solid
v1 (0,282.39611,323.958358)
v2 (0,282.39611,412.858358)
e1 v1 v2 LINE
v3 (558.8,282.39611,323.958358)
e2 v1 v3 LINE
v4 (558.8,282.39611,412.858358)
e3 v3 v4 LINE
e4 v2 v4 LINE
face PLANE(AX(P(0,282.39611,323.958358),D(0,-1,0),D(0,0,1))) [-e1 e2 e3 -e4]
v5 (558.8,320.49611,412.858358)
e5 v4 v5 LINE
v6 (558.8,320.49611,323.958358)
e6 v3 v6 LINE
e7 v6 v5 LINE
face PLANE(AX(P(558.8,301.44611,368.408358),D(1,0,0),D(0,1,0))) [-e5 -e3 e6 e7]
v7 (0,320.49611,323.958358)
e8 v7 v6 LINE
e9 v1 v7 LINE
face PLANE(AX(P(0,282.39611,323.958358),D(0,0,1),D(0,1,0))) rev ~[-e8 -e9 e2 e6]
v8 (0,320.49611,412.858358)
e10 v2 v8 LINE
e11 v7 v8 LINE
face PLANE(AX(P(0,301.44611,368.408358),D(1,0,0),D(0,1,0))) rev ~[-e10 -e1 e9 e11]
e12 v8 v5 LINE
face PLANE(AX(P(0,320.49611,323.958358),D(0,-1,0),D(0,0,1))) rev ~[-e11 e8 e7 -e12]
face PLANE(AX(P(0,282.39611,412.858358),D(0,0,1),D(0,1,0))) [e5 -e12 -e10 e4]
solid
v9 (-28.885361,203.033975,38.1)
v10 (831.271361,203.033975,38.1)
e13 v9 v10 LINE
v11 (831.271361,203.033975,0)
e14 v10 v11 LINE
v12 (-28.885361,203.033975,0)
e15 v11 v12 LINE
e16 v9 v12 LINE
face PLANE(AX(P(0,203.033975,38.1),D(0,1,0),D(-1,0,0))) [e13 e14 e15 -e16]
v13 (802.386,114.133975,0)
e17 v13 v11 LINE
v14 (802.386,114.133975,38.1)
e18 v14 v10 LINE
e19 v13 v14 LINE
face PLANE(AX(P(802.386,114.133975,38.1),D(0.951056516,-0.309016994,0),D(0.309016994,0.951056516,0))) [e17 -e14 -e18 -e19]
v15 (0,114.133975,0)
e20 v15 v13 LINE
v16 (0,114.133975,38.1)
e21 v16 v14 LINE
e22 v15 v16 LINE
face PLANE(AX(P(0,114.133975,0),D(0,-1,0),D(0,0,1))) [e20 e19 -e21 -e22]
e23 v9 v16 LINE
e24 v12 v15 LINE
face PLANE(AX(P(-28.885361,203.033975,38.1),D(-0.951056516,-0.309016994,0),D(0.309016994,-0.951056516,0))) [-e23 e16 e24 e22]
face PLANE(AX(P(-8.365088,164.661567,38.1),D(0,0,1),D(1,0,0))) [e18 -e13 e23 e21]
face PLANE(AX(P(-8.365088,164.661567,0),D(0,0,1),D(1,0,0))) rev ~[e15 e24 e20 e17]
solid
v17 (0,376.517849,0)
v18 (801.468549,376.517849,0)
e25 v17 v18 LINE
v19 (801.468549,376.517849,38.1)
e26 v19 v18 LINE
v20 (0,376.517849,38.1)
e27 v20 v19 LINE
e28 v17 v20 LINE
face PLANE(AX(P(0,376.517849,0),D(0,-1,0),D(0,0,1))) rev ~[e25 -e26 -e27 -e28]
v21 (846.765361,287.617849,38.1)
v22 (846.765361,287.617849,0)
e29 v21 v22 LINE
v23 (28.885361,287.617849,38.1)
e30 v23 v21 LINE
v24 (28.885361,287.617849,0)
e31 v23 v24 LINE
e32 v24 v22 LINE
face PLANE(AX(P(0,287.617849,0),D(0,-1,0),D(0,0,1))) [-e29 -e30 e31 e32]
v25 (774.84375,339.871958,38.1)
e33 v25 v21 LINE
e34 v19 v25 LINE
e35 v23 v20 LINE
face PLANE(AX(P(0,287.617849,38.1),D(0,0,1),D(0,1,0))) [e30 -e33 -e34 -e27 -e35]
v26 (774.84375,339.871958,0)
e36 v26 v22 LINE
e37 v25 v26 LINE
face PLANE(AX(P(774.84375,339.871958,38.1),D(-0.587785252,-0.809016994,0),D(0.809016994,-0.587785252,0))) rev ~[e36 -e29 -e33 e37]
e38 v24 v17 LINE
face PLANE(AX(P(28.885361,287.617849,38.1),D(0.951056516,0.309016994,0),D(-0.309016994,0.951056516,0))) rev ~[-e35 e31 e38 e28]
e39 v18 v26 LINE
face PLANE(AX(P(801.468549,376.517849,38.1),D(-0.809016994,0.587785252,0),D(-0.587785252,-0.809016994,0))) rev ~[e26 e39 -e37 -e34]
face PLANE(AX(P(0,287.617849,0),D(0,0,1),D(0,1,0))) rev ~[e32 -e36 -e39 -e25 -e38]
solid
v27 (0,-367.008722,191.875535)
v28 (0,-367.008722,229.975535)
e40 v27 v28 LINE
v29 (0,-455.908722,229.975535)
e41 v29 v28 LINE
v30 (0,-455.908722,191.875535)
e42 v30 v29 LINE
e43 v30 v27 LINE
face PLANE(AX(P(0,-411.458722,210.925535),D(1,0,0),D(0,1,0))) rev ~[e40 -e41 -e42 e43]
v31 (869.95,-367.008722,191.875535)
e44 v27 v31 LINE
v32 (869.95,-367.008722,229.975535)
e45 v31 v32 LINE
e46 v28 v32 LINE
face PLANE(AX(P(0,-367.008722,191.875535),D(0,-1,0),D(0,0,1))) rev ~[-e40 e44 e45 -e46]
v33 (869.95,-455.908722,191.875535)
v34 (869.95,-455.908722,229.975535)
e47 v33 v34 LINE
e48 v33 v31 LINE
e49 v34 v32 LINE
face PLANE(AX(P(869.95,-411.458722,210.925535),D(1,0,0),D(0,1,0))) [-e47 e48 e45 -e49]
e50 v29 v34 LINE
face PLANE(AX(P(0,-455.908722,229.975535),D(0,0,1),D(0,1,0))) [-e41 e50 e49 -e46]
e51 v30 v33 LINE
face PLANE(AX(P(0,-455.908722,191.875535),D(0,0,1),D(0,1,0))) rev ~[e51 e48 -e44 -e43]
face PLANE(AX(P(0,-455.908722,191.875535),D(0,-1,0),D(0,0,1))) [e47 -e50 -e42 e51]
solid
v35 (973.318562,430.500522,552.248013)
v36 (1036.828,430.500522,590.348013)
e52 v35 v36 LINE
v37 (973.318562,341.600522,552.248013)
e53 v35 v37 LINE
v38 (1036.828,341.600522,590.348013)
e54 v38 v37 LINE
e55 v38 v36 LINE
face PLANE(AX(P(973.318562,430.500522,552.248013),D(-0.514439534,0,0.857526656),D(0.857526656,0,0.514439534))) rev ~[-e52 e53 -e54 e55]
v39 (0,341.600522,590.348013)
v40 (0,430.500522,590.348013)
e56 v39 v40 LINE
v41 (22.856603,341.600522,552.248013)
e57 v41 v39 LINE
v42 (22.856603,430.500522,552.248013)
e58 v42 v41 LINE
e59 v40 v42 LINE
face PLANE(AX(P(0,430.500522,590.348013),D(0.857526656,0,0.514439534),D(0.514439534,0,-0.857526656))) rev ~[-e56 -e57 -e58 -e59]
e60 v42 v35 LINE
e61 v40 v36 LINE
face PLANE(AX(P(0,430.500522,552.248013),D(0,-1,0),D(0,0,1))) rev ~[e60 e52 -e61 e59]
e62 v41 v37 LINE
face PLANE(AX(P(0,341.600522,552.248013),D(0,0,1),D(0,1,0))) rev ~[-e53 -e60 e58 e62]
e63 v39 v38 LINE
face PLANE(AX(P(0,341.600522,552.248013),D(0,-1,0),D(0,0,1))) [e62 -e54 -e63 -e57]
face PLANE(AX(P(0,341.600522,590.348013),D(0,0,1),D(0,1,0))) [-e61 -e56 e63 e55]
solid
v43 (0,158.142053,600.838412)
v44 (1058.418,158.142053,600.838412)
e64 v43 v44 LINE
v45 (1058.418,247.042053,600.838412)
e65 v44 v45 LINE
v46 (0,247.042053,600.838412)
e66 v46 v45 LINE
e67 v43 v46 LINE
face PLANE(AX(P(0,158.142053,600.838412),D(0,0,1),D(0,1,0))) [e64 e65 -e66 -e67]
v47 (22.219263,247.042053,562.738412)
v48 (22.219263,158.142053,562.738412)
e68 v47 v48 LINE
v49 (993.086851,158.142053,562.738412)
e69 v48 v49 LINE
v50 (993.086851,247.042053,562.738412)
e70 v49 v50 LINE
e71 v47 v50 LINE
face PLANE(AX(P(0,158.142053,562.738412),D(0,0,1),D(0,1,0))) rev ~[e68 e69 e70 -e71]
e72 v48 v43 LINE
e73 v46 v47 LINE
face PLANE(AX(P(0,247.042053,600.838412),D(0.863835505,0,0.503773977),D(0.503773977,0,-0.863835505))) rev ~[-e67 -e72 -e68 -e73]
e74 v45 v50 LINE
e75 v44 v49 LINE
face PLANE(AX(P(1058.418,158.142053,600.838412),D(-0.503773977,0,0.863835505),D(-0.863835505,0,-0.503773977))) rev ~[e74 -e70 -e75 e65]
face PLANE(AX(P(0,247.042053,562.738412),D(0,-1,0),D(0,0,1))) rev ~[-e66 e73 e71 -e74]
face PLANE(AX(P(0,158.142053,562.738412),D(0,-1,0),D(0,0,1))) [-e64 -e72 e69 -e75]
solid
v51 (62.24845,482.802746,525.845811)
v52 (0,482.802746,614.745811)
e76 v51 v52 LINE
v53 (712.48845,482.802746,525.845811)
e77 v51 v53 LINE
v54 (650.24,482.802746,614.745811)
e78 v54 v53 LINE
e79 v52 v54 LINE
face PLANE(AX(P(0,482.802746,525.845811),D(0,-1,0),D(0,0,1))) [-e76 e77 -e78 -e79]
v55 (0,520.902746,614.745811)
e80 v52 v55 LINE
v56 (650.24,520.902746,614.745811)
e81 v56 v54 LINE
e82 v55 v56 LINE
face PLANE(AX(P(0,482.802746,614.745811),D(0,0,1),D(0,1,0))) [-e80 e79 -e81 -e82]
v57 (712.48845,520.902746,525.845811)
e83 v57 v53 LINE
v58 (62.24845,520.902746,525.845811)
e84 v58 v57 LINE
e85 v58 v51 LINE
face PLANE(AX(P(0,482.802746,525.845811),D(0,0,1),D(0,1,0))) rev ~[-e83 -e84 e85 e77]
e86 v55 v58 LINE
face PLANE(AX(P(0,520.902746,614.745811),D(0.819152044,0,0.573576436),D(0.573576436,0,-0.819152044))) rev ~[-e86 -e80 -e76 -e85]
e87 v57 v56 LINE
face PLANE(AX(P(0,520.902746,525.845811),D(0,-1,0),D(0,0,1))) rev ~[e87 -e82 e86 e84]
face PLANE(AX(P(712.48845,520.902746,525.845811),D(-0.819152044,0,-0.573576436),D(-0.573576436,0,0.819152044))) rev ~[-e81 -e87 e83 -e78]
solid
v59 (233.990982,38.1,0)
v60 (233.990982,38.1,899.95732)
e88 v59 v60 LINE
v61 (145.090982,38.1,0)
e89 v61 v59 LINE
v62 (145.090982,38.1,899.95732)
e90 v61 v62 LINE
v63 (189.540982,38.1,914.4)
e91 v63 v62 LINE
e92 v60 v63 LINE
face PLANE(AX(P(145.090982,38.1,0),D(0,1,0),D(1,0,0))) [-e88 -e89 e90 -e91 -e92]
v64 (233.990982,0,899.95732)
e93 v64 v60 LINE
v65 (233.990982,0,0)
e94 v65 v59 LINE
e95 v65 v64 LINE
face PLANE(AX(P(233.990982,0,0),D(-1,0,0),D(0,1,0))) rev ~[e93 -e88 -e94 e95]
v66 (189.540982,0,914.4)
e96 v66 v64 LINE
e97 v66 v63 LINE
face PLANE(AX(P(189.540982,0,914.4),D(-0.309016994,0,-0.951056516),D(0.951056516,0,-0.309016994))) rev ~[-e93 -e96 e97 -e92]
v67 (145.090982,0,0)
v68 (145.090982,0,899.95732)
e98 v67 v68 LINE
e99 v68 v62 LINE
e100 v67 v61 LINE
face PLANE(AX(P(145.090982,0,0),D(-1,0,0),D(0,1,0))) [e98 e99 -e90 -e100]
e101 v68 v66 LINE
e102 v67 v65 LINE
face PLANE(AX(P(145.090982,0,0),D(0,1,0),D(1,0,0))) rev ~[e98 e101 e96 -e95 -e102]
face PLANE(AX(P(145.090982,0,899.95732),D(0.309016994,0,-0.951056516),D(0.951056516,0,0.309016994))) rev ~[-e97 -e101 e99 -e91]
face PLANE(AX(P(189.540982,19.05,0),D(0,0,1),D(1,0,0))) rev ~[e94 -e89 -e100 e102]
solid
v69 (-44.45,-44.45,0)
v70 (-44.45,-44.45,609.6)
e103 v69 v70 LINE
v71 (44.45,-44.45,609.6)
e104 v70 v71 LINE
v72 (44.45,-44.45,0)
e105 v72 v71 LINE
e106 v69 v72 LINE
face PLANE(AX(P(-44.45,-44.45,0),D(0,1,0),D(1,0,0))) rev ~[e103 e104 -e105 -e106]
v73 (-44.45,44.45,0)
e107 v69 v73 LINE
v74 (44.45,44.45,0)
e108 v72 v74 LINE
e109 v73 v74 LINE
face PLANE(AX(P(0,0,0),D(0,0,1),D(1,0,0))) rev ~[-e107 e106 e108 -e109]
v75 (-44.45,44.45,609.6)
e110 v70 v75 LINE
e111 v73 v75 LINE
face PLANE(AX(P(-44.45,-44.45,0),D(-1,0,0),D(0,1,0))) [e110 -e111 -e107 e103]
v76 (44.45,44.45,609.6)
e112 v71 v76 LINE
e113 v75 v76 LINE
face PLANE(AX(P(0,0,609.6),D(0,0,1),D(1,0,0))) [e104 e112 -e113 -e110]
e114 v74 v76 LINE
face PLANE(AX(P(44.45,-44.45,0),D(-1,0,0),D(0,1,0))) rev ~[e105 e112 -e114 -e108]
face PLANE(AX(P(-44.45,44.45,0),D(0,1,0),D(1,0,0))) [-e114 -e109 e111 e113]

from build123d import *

# Parameters (mm, degrees)
F0_W      = 88.9
F0_H      = 88.9
F1_DEPTH  = 609.6
F2_W      = 88.9
F2_H      = 38.1
F3_DEPTH  = 914.4
F5_DEPTH  = 44.451
F6_W      = 88.9
F6_H      = 38.1
F7_DEPTH  = 802.386
F9_DEPTH  = 38.1
F10_W     = 88.9
F10_H     = 38.1
F11_DEPTH = 1058.418
F13_DEPTH = 88.901
F15_DEPTH = 291.4930525193
F16_W     = 88.9
F16_H     = 38.1
F17_DEPTH = 869.95
F18_W     = 88.9
F18_H     = 38.1
F19_DEPTH = 1036.828
F21_DEPTH = 886.4102444897
F22_DEPTH = 886.4102444897
F23_W     = 88.9
F23_H     = 38.1
F24_DEPTH = 1066.8
F26_DEPTH = 38.101
F28_DEPTH = 38.101
F29_W     = 38.1
F29_H     = 88.9
F30_DEPTH = 558.8
F31_W     = 38.1
F31_H     = 88.9
F32_DEPTH = 762
F34_DEPTH = 976.812467675
F36_DEPTH = 976.812467675
F37_W     = 88.9
F37_H     = 38.1
F38_DEPTH = 508
F40_DEPTH = 38.101
F42_DEPTH = 38.101


with BuildPart() as f1:
    # F0 (on Top) → F1 (new body)
    with BuildSketch(Plane.XY):
        Rectangle(F0_W, F0_H)
    extrude(amount=F1_DEPTH)


with BuildPart() as f3:
    # F2 (on Top) → F3 (new body)
    with BuildSketch(Plane.XY):
        with Locations((189.5409819244, 19.05)):
            Rectangle(F2_W, F2_H)
    extrude(amount=F3_DEPTH)

    # F4 (on face) → F5 (cut, through all)
    with BuildSketch(Plane.XZ):
        Polygon((145.0909819244, 899.9573195024), (189.5409819244, 914.4), (145.0909819244, 914.4), align=None)
        Polygon((233.9909819244, 914.4), (189.5409819244, 914.4), (233.9909819244, 899.9573195024), align=None)
    extrude(amount=-F5_DEPTH, mode=Mode.SUBTRACT)


with BuildPart() as f7:
    # F6 (on Right) → F7 (new body)
    with BuildSketch(Plane.YZ):
        with Locations((158.5839751139, 19.05)):
            Rectangle(F6_W, F6_H)
    extrude(amount=F7_DEPTH)

    # F8 (on face) → F9 (join)
    with BuildSketch(Plane.XY.offset(38.1)):
        Polygon((-28.8853609951, 203.0339751139), (0, 114.1339751139), (0, 203.0339751139), align=None)
        Polygon((802.386, 203.0339751139), (802.386, 114.1339751139), (831.2713609951, 203.0339751139), align=None)
    extrude(amount=-F9_DEPTH)


with BuildPart() as f11:
    # F10 (on Right) → F11 (new body)
    with BuildSketch(Plane.YZ):
        with Locations((202.5920525193, 581.7884122946)):
            Rectangle(F10_W, F10_H)
    extrude(amount=F11_DEPTH)

    # F12 (on face) → F13 (cut, through all)
    with BuildSketch(Plane.XZ.offset(-158.1420525193)):
        Polygon((1058.418, 562.7384122946), (1058.418, 600.8384122946), (993.0868510167, 562.7384122946), align=None)
    extrude(amount=-F13_DEPTH, mode=Mode.SUBTRACT)

    # F14 (on face) → F15 (cut, through all)
    with BuildSketch(Plane(origin=(0, 247.0420525193, 0), x_dir=(-1, 0, 0), z_dir=(0, 1, 0))):
        Polygon((0, 562.7384122946), (0, 600.8384122946), (-22.2192632854, 562.7384122946), align=None)
    extrude(amount=-F15_DEPTH, mode=Mode.SUBTRACT)


with BuildPart() as f17:
    # F16 (on Right) → F17 (new body)
    with BuildSketch(Plane.YZ):
        with Locations((-411.4587221622, 210.9255347661)):
            Rectangle(F16_W, F16_H)
    extrude(amount=F17_DEPTH)


with BuildPart() as f19:
    # F18 (on Right) → F19 (new body)
    with BuildSketch(Plane.YZ):
        with Locations((386.0505223274, 571.2980129524)):
            Rectangle(F18_W, F18_H)
    extrude(amount=F19_DEPTH)

    # F20 (on face) → F21 (cut, through all)
    with BuildSketch(Plane(origin=(0, 430.5005223274, 0), x_dir=(-1, 0, 0), z_dir=(0, 1, 0))):
        Polygon((0, 552.2480129524), (0, 590.3480129524), (-22.856602877, 552.2480129524), align=None)
    extrude(amount=-F21_DEPTH, mode=Mode.SUBTRACT)

    # F20 (on face) → F22 (cut, through all)
    with BuildSketch(Plane(origin=(0, 430.5005223274, 0), x_dir=(-1, 0, 0), z_dir=(0, 1, 0))):
        Polygon((-973.3185621448, 552.2480129524), (-1036.828, 590.3480129524), (-1036.828, 552.2480129524), align=None)
    extrude(amount=-F22_DEPTH, mode=Mode.SUBTRACT)


with BuildPart() as f24:
    # F23 (on Right) → F24 (new body)
    with BuildSketch(Plane.YZ):
        with Locations((332.0678491998, 19.05)):
            Rectangle(F23_W, F23_H)
    extrude(amount=F24_DEPTH)

    # F25 (on face) → F26 (cut, through all)
    with BuildSketch(Plane.XY.offset(38.1)):
        Polygon((28.8853609951, 287.6178491998), (0, 376.5178491998), (0, 287.6178491998), align=None)
    extrude(amount=-F26_DEPTH, mode=Mode.SUBTRACT)

    # F27 (on face) → F28 (cut, through all)
    with BuildSketch(Plane.XY.offset(38.1)):
        Polygon((774.8437501952, 339.8719581286), (846.7653609951, 287.6178491998), (1066.8, 287.6178491998), (1066.8, 376.5178491998), (801.4685485351, 376.5178491998), align=None)
    extrude(amount=-F28_DEPTH, mode=Mode.SUBTRACT)


with BuildPart() as f30:
    # F29 (on Right) → F30 (new body)
    with BuildSketch(Plane.YZ):
        with Locations((301.4461100101, 368.408357701)):
            Rectangle(F29_W, F29_H)
    extrude(amount=F30_DEPTH)


with BuildPart() as f32:
    # F31 (on Right) → F32 (new body)
    with BuildSketch(Plane.YZ):
        with Locations((501.8527455127, 570.2958106995)):
            Rectangle(F31_W, F31_H)
    extrude(amount=F32_DEPTH)

    # F33 (on face) → F34 (cut, through all)
    with BuildSketch(Plane(origin=(0, 520.9027455127, 0), x_dir=(-1, 0, 0), z_dir=(0, 1, 0))):
        Polygon((0, 525.8458106995), (0, 614.7458106995), (-62.2484501468, 525.8458106995), align=None)
    extrude(amount=-F34_DEPTH, mode=Mode.SUBTRACT)

    # F35 (on face) → F36 (cut, through all)
    with BuildSketch(Plane(origin=(0, 520.9027455127, 0), x_dir=(-1, 0, 0), z_dir=(0, 1, 0))):
        Polygon((-762, 525.8458106995), (-712.4884501468, 525.8458106995), (-650.24, 614.7458106995), (-762, 614.7458106995), align=None)
    extrude(amount=-F36_DEPTH, mode=Mode.SUBTRACT)


with BuildPart() as f38:
    # F37 (on face) → F38 (new body)
    with BuildSketch(Plane(origin=(110.6558194923, 35.9542552558, 0), x_dir=(0.3090169944, -0.9510565163, 0), z_dir=(-0.9510565163, -0.3090169944, 0))):
        with Locations((-1037.2092051929, 19.05)):
            Rectangle(F37_W, F37_H)
    extrude(amount=F38_DEPTH)

    # F39 (on face) → F40 (cut, through all)
    with BuildSketch(Plane.XY.offset(38.1)):
        Polygon((-630.4460123089, 839.0044752145), (-706.7319673124, 907.6926576227), (-679.2603565124, 823.1437333241), align=None)
    extrude(amount=-F40_DEPTH, mode=Mode.SUBTRACT)

    # F41 (on face) → F42 (cut, through all)
    with BuildSketch(Plane.XY.offset(38.1)):
        Polygon((-196.1236462345, 980.1243664665), (-223.5952570344, 1064.6732907652), (-244.937990438, 964.2636245761), align=None)
    extrude(amount=-F42_DEPTH, mode=Mode.SUBTRACT)


solid = Compound([f1.part, f3.part, f7.part, f11.part, f17.part, f19.part, f24.part, f30.part, f32.part])
